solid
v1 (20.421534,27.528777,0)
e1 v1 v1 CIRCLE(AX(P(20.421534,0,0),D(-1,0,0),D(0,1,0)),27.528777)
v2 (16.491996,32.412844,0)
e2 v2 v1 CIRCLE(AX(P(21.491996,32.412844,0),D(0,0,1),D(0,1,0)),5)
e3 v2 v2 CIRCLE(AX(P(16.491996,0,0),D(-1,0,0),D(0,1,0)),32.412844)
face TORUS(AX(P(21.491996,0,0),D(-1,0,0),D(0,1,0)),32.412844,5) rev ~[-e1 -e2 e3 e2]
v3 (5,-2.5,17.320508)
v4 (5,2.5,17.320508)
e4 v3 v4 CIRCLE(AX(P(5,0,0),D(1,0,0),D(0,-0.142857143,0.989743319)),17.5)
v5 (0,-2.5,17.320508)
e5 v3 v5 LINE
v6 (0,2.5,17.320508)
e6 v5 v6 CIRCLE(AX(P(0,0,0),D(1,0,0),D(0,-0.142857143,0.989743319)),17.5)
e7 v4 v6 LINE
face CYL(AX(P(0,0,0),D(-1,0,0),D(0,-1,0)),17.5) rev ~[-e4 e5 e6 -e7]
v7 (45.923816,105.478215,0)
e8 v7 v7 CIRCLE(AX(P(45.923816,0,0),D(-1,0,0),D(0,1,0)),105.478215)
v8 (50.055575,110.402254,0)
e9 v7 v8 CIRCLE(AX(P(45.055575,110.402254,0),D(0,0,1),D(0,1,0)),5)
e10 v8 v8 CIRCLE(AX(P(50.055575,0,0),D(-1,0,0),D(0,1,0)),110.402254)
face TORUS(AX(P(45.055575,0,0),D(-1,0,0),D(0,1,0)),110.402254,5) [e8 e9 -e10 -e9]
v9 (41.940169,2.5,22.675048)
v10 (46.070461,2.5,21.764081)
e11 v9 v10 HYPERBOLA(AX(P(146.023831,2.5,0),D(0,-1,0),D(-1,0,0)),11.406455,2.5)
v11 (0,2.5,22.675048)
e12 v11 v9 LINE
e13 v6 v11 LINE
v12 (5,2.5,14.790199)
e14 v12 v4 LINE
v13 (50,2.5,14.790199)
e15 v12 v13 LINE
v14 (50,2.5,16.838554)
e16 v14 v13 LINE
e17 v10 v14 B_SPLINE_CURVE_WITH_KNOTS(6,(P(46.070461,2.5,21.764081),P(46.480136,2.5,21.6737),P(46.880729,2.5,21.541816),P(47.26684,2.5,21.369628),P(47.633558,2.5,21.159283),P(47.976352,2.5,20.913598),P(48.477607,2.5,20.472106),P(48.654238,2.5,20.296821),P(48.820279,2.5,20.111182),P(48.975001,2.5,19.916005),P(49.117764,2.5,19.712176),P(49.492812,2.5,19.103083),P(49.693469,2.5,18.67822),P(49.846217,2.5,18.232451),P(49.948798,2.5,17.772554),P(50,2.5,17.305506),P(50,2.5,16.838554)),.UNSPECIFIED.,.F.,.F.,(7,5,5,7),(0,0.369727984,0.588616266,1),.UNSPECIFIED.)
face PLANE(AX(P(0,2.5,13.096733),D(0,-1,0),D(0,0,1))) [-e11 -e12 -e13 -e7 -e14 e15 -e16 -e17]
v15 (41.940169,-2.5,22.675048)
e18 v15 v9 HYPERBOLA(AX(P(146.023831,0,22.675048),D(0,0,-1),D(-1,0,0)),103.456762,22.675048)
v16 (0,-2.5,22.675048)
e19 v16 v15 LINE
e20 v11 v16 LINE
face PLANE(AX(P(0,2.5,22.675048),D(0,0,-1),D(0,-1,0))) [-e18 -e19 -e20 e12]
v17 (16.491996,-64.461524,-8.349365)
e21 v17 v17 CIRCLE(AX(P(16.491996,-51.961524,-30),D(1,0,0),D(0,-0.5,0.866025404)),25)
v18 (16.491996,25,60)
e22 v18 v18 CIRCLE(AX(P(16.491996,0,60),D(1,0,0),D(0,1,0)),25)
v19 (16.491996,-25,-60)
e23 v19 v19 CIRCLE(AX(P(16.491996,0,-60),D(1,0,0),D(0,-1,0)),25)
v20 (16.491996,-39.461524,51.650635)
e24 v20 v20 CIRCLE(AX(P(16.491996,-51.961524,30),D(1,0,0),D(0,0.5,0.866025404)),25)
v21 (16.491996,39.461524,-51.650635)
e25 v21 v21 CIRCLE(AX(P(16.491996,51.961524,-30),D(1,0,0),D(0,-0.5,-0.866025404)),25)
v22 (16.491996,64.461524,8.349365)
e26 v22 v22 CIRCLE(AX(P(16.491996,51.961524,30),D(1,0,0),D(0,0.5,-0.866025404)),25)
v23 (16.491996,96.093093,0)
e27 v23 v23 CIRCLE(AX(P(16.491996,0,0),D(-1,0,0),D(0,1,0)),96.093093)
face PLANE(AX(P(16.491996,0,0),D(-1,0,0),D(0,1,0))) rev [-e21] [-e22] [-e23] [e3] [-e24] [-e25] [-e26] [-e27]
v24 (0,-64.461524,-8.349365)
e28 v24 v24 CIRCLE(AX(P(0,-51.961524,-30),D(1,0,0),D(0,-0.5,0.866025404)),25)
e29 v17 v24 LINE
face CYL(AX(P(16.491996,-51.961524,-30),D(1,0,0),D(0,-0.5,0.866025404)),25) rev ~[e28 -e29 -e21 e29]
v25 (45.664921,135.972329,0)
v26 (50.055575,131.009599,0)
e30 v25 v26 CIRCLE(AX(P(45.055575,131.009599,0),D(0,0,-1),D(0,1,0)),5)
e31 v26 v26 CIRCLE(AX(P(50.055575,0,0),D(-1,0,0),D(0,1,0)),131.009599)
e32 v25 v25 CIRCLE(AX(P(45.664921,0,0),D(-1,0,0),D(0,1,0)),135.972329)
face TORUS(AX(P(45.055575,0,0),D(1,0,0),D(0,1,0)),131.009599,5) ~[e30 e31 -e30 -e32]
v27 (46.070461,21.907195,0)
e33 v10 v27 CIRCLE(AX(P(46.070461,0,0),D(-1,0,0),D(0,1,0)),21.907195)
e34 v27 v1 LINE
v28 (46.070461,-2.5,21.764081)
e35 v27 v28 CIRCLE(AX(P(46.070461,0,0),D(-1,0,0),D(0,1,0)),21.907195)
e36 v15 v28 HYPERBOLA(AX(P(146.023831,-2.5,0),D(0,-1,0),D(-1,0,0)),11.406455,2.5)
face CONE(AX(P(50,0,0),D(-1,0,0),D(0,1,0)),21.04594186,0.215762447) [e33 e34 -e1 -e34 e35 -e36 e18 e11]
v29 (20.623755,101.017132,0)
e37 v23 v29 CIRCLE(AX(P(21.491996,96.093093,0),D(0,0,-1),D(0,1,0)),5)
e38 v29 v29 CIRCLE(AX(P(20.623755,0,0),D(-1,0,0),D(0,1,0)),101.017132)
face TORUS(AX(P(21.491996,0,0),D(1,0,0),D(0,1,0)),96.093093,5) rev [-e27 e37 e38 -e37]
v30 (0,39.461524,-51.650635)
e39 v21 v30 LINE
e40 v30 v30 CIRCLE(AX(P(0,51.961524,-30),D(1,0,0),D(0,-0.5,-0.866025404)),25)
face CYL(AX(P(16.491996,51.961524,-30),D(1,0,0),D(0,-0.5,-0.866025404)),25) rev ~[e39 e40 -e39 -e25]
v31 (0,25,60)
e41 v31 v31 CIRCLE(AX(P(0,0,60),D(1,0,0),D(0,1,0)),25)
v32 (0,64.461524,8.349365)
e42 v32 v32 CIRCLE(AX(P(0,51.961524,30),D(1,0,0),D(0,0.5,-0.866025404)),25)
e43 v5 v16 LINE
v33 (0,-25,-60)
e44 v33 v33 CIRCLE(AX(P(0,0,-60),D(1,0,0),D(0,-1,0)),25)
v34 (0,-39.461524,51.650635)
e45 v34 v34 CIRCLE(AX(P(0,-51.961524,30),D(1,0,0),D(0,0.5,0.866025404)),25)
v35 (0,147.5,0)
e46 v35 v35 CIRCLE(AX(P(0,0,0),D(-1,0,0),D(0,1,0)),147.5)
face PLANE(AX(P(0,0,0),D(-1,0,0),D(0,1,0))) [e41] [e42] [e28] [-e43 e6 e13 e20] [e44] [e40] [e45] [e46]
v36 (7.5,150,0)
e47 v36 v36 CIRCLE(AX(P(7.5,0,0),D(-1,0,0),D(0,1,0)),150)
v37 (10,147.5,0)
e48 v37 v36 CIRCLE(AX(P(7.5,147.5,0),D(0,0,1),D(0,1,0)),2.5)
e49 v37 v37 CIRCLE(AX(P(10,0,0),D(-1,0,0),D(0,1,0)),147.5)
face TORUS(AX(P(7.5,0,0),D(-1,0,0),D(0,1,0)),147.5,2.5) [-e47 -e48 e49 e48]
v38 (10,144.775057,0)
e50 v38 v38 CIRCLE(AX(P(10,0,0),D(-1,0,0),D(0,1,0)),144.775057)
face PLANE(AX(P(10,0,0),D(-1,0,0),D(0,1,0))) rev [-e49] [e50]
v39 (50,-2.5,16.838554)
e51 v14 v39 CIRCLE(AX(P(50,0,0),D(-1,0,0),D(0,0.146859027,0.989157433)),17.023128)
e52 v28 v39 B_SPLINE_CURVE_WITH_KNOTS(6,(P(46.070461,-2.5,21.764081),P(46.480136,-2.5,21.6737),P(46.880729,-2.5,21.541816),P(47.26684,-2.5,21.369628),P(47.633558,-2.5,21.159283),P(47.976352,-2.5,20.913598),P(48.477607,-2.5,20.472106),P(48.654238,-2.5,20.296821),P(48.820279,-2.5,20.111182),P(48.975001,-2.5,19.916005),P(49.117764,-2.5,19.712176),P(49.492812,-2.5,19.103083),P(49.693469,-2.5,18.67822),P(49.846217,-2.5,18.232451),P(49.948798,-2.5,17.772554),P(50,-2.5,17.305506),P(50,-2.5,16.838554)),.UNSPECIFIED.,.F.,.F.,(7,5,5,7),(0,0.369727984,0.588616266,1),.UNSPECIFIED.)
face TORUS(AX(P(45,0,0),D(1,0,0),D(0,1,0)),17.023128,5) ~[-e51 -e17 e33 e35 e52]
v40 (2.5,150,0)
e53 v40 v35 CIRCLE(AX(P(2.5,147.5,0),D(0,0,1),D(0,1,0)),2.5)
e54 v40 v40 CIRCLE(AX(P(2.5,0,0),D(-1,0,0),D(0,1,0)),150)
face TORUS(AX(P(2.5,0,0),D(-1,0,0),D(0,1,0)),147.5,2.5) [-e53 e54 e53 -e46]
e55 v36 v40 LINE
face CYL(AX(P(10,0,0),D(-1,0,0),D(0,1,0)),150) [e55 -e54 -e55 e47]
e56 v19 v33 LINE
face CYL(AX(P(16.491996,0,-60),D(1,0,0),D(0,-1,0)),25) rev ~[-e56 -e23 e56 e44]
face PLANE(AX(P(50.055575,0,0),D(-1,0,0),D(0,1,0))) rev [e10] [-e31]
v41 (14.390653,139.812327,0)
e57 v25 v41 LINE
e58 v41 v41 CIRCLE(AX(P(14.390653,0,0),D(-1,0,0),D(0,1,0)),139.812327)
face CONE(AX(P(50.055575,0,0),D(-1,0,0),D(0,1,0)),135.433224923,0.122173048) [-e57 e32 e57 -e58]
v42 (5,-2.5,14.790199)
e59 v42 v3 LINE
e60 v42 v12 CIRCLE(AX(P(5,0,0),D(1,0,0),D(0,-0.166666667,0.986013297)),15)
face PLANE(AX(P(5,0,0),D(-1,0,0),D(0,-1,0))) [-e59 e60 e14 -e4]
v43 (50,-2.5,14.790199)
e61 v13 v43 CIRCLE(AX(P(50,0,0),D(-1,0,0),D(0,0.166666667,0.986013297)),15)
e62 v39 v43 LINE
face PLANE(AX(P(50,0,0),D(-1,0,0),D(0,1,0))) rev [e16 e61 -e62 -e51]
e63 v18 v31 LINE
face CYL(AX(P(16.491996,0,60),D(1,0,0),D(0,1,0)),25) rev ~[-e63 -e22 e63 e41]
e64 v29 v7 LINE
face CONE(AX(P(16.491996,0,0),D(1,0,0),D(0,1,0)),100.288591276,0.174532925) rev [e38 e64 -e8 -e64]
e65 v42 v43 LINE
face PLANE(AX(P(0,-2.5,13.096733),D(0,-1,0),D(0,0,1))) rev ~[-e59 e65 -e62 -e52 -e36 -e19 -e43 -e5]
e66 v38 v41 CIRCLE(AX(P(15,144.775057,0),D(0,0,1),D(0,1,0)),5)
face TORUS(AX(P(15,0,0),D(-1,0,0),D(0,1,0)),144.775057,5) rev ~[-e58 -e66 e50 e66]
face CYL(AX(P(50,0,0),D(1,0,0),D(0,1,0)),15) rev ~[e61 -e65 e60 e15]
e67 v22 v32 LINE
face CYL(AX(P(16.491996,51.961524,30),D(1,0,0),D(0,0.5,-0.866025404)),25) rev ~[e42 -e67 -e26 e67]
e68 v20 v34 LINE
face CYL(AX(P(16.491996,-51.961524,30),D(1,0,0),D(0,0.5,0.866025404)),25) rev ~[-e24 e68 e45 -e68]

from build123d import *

# Parameters (mm, degrees)
F2_R            = 15
F3_DEPTH        = 50
F4_R            = 25
F5_DEPTH        = 16.491995675
F5_COPIES_COUNT = 6
F6_R            = 17.5
F7_DEPTH        = 5
F8_R            = 5
F9_R            = 2.5
F10_W           = 5
F10_H           = 9.5783152908
F11_DEPTH       = 50.0010001


# Not quite as in the source:
# - a pattern or mirror of a feature is missing from the dataset's text; its kind, count and spacing are read off the source's solid


with BuildPart() as f1:
    # F0 (on Top) → F1 (revolve)
    with BuildSketch(Plane.XY):
        Polygon((0, 150), (0, 0), (50, 0), (50, 21.0459418595), (16.491995675, 28.3900303053), (16.491995675, 100.2885912763), (50.0555746781, 106.2067558237), (50.0555746781, 135.4332249232), (10, 140.3514310718), (10, 150), align=None)
    revolve(axis=Axis((25, 0, 0), (-1, 0, 0)))

    # F2 (on face) → F3 (cut, through all)
    with BuildSketch(Plane.YZ.offset(50)):
        Circle(F2_R)
    extrude(amount=-F3_DEPTH, mode=Mode.SUBTRACT)

    # F4 (on face) → F5 (cut, through all)
    with BuildSketch(Plane.YZ.offset(16.491995675)):
        with Locations((0, 60)):
            Circle(F4_R)
    f5 = extrude(amount=-F5_DEPTH, mode=Mode.SUBTRACT)

    # F5_copies: F5 ×6 about axis
    f5_copies_axis = Axis((0, 0, 0), (1, 0, 0))
    for i in range(1, F5_COPIES_COUNT):
        add(f5.rotate(f5_copies_axis, i * 360 / F5_COPIES_COUNT), mode=Mode.SUBTRACT)

    # F6 (on face) → F7 (cut)
    with BuildSketch(Plane(origin=(0, 0, 0), x_dir=(0, -1, 0), z_dir=(-1, 0, 0))):
        Circle(F6_R)
    extrude(amount=-F7_DEPTH, mode=Mode.SUBTRACT)

    # F8
    f8_edges = [f1.edges().sort_by_distance(p)[0] for p in [
        (16.491996, -100.288591, 0),
        (50.055575, -106.206756, 0),
        (50.055575, -135.433225, 0),
        (10, -140.351431, 0),
        (50, -21.045942, 0),
        (16.491996, -28.39003, 0),
    ]]
    fillet(f8_edges, radius=F8_R)

    # F9
    f9_edges = [f1.edges().sort_by_distance(p)[0] for p in [
        (10, -150, 0),
        (0, -150, 0),
    ]]
    fillet(f9_edges, radius=F9_R)

    # F10 (on face) → F11 (cut, through all)
    with BuildSketch(Plane(origin=(0, 0, 0), x_dir=(0, -1, 0), z_dir=(-1, 0, 0))):
        with Locations((0, 17.8858903802)):
            Rectangle(F10_W, F10_H)
    extrude(amount=-F11_DEPTH, mode=Mode.SUBTRACT)


solid = f1.part
